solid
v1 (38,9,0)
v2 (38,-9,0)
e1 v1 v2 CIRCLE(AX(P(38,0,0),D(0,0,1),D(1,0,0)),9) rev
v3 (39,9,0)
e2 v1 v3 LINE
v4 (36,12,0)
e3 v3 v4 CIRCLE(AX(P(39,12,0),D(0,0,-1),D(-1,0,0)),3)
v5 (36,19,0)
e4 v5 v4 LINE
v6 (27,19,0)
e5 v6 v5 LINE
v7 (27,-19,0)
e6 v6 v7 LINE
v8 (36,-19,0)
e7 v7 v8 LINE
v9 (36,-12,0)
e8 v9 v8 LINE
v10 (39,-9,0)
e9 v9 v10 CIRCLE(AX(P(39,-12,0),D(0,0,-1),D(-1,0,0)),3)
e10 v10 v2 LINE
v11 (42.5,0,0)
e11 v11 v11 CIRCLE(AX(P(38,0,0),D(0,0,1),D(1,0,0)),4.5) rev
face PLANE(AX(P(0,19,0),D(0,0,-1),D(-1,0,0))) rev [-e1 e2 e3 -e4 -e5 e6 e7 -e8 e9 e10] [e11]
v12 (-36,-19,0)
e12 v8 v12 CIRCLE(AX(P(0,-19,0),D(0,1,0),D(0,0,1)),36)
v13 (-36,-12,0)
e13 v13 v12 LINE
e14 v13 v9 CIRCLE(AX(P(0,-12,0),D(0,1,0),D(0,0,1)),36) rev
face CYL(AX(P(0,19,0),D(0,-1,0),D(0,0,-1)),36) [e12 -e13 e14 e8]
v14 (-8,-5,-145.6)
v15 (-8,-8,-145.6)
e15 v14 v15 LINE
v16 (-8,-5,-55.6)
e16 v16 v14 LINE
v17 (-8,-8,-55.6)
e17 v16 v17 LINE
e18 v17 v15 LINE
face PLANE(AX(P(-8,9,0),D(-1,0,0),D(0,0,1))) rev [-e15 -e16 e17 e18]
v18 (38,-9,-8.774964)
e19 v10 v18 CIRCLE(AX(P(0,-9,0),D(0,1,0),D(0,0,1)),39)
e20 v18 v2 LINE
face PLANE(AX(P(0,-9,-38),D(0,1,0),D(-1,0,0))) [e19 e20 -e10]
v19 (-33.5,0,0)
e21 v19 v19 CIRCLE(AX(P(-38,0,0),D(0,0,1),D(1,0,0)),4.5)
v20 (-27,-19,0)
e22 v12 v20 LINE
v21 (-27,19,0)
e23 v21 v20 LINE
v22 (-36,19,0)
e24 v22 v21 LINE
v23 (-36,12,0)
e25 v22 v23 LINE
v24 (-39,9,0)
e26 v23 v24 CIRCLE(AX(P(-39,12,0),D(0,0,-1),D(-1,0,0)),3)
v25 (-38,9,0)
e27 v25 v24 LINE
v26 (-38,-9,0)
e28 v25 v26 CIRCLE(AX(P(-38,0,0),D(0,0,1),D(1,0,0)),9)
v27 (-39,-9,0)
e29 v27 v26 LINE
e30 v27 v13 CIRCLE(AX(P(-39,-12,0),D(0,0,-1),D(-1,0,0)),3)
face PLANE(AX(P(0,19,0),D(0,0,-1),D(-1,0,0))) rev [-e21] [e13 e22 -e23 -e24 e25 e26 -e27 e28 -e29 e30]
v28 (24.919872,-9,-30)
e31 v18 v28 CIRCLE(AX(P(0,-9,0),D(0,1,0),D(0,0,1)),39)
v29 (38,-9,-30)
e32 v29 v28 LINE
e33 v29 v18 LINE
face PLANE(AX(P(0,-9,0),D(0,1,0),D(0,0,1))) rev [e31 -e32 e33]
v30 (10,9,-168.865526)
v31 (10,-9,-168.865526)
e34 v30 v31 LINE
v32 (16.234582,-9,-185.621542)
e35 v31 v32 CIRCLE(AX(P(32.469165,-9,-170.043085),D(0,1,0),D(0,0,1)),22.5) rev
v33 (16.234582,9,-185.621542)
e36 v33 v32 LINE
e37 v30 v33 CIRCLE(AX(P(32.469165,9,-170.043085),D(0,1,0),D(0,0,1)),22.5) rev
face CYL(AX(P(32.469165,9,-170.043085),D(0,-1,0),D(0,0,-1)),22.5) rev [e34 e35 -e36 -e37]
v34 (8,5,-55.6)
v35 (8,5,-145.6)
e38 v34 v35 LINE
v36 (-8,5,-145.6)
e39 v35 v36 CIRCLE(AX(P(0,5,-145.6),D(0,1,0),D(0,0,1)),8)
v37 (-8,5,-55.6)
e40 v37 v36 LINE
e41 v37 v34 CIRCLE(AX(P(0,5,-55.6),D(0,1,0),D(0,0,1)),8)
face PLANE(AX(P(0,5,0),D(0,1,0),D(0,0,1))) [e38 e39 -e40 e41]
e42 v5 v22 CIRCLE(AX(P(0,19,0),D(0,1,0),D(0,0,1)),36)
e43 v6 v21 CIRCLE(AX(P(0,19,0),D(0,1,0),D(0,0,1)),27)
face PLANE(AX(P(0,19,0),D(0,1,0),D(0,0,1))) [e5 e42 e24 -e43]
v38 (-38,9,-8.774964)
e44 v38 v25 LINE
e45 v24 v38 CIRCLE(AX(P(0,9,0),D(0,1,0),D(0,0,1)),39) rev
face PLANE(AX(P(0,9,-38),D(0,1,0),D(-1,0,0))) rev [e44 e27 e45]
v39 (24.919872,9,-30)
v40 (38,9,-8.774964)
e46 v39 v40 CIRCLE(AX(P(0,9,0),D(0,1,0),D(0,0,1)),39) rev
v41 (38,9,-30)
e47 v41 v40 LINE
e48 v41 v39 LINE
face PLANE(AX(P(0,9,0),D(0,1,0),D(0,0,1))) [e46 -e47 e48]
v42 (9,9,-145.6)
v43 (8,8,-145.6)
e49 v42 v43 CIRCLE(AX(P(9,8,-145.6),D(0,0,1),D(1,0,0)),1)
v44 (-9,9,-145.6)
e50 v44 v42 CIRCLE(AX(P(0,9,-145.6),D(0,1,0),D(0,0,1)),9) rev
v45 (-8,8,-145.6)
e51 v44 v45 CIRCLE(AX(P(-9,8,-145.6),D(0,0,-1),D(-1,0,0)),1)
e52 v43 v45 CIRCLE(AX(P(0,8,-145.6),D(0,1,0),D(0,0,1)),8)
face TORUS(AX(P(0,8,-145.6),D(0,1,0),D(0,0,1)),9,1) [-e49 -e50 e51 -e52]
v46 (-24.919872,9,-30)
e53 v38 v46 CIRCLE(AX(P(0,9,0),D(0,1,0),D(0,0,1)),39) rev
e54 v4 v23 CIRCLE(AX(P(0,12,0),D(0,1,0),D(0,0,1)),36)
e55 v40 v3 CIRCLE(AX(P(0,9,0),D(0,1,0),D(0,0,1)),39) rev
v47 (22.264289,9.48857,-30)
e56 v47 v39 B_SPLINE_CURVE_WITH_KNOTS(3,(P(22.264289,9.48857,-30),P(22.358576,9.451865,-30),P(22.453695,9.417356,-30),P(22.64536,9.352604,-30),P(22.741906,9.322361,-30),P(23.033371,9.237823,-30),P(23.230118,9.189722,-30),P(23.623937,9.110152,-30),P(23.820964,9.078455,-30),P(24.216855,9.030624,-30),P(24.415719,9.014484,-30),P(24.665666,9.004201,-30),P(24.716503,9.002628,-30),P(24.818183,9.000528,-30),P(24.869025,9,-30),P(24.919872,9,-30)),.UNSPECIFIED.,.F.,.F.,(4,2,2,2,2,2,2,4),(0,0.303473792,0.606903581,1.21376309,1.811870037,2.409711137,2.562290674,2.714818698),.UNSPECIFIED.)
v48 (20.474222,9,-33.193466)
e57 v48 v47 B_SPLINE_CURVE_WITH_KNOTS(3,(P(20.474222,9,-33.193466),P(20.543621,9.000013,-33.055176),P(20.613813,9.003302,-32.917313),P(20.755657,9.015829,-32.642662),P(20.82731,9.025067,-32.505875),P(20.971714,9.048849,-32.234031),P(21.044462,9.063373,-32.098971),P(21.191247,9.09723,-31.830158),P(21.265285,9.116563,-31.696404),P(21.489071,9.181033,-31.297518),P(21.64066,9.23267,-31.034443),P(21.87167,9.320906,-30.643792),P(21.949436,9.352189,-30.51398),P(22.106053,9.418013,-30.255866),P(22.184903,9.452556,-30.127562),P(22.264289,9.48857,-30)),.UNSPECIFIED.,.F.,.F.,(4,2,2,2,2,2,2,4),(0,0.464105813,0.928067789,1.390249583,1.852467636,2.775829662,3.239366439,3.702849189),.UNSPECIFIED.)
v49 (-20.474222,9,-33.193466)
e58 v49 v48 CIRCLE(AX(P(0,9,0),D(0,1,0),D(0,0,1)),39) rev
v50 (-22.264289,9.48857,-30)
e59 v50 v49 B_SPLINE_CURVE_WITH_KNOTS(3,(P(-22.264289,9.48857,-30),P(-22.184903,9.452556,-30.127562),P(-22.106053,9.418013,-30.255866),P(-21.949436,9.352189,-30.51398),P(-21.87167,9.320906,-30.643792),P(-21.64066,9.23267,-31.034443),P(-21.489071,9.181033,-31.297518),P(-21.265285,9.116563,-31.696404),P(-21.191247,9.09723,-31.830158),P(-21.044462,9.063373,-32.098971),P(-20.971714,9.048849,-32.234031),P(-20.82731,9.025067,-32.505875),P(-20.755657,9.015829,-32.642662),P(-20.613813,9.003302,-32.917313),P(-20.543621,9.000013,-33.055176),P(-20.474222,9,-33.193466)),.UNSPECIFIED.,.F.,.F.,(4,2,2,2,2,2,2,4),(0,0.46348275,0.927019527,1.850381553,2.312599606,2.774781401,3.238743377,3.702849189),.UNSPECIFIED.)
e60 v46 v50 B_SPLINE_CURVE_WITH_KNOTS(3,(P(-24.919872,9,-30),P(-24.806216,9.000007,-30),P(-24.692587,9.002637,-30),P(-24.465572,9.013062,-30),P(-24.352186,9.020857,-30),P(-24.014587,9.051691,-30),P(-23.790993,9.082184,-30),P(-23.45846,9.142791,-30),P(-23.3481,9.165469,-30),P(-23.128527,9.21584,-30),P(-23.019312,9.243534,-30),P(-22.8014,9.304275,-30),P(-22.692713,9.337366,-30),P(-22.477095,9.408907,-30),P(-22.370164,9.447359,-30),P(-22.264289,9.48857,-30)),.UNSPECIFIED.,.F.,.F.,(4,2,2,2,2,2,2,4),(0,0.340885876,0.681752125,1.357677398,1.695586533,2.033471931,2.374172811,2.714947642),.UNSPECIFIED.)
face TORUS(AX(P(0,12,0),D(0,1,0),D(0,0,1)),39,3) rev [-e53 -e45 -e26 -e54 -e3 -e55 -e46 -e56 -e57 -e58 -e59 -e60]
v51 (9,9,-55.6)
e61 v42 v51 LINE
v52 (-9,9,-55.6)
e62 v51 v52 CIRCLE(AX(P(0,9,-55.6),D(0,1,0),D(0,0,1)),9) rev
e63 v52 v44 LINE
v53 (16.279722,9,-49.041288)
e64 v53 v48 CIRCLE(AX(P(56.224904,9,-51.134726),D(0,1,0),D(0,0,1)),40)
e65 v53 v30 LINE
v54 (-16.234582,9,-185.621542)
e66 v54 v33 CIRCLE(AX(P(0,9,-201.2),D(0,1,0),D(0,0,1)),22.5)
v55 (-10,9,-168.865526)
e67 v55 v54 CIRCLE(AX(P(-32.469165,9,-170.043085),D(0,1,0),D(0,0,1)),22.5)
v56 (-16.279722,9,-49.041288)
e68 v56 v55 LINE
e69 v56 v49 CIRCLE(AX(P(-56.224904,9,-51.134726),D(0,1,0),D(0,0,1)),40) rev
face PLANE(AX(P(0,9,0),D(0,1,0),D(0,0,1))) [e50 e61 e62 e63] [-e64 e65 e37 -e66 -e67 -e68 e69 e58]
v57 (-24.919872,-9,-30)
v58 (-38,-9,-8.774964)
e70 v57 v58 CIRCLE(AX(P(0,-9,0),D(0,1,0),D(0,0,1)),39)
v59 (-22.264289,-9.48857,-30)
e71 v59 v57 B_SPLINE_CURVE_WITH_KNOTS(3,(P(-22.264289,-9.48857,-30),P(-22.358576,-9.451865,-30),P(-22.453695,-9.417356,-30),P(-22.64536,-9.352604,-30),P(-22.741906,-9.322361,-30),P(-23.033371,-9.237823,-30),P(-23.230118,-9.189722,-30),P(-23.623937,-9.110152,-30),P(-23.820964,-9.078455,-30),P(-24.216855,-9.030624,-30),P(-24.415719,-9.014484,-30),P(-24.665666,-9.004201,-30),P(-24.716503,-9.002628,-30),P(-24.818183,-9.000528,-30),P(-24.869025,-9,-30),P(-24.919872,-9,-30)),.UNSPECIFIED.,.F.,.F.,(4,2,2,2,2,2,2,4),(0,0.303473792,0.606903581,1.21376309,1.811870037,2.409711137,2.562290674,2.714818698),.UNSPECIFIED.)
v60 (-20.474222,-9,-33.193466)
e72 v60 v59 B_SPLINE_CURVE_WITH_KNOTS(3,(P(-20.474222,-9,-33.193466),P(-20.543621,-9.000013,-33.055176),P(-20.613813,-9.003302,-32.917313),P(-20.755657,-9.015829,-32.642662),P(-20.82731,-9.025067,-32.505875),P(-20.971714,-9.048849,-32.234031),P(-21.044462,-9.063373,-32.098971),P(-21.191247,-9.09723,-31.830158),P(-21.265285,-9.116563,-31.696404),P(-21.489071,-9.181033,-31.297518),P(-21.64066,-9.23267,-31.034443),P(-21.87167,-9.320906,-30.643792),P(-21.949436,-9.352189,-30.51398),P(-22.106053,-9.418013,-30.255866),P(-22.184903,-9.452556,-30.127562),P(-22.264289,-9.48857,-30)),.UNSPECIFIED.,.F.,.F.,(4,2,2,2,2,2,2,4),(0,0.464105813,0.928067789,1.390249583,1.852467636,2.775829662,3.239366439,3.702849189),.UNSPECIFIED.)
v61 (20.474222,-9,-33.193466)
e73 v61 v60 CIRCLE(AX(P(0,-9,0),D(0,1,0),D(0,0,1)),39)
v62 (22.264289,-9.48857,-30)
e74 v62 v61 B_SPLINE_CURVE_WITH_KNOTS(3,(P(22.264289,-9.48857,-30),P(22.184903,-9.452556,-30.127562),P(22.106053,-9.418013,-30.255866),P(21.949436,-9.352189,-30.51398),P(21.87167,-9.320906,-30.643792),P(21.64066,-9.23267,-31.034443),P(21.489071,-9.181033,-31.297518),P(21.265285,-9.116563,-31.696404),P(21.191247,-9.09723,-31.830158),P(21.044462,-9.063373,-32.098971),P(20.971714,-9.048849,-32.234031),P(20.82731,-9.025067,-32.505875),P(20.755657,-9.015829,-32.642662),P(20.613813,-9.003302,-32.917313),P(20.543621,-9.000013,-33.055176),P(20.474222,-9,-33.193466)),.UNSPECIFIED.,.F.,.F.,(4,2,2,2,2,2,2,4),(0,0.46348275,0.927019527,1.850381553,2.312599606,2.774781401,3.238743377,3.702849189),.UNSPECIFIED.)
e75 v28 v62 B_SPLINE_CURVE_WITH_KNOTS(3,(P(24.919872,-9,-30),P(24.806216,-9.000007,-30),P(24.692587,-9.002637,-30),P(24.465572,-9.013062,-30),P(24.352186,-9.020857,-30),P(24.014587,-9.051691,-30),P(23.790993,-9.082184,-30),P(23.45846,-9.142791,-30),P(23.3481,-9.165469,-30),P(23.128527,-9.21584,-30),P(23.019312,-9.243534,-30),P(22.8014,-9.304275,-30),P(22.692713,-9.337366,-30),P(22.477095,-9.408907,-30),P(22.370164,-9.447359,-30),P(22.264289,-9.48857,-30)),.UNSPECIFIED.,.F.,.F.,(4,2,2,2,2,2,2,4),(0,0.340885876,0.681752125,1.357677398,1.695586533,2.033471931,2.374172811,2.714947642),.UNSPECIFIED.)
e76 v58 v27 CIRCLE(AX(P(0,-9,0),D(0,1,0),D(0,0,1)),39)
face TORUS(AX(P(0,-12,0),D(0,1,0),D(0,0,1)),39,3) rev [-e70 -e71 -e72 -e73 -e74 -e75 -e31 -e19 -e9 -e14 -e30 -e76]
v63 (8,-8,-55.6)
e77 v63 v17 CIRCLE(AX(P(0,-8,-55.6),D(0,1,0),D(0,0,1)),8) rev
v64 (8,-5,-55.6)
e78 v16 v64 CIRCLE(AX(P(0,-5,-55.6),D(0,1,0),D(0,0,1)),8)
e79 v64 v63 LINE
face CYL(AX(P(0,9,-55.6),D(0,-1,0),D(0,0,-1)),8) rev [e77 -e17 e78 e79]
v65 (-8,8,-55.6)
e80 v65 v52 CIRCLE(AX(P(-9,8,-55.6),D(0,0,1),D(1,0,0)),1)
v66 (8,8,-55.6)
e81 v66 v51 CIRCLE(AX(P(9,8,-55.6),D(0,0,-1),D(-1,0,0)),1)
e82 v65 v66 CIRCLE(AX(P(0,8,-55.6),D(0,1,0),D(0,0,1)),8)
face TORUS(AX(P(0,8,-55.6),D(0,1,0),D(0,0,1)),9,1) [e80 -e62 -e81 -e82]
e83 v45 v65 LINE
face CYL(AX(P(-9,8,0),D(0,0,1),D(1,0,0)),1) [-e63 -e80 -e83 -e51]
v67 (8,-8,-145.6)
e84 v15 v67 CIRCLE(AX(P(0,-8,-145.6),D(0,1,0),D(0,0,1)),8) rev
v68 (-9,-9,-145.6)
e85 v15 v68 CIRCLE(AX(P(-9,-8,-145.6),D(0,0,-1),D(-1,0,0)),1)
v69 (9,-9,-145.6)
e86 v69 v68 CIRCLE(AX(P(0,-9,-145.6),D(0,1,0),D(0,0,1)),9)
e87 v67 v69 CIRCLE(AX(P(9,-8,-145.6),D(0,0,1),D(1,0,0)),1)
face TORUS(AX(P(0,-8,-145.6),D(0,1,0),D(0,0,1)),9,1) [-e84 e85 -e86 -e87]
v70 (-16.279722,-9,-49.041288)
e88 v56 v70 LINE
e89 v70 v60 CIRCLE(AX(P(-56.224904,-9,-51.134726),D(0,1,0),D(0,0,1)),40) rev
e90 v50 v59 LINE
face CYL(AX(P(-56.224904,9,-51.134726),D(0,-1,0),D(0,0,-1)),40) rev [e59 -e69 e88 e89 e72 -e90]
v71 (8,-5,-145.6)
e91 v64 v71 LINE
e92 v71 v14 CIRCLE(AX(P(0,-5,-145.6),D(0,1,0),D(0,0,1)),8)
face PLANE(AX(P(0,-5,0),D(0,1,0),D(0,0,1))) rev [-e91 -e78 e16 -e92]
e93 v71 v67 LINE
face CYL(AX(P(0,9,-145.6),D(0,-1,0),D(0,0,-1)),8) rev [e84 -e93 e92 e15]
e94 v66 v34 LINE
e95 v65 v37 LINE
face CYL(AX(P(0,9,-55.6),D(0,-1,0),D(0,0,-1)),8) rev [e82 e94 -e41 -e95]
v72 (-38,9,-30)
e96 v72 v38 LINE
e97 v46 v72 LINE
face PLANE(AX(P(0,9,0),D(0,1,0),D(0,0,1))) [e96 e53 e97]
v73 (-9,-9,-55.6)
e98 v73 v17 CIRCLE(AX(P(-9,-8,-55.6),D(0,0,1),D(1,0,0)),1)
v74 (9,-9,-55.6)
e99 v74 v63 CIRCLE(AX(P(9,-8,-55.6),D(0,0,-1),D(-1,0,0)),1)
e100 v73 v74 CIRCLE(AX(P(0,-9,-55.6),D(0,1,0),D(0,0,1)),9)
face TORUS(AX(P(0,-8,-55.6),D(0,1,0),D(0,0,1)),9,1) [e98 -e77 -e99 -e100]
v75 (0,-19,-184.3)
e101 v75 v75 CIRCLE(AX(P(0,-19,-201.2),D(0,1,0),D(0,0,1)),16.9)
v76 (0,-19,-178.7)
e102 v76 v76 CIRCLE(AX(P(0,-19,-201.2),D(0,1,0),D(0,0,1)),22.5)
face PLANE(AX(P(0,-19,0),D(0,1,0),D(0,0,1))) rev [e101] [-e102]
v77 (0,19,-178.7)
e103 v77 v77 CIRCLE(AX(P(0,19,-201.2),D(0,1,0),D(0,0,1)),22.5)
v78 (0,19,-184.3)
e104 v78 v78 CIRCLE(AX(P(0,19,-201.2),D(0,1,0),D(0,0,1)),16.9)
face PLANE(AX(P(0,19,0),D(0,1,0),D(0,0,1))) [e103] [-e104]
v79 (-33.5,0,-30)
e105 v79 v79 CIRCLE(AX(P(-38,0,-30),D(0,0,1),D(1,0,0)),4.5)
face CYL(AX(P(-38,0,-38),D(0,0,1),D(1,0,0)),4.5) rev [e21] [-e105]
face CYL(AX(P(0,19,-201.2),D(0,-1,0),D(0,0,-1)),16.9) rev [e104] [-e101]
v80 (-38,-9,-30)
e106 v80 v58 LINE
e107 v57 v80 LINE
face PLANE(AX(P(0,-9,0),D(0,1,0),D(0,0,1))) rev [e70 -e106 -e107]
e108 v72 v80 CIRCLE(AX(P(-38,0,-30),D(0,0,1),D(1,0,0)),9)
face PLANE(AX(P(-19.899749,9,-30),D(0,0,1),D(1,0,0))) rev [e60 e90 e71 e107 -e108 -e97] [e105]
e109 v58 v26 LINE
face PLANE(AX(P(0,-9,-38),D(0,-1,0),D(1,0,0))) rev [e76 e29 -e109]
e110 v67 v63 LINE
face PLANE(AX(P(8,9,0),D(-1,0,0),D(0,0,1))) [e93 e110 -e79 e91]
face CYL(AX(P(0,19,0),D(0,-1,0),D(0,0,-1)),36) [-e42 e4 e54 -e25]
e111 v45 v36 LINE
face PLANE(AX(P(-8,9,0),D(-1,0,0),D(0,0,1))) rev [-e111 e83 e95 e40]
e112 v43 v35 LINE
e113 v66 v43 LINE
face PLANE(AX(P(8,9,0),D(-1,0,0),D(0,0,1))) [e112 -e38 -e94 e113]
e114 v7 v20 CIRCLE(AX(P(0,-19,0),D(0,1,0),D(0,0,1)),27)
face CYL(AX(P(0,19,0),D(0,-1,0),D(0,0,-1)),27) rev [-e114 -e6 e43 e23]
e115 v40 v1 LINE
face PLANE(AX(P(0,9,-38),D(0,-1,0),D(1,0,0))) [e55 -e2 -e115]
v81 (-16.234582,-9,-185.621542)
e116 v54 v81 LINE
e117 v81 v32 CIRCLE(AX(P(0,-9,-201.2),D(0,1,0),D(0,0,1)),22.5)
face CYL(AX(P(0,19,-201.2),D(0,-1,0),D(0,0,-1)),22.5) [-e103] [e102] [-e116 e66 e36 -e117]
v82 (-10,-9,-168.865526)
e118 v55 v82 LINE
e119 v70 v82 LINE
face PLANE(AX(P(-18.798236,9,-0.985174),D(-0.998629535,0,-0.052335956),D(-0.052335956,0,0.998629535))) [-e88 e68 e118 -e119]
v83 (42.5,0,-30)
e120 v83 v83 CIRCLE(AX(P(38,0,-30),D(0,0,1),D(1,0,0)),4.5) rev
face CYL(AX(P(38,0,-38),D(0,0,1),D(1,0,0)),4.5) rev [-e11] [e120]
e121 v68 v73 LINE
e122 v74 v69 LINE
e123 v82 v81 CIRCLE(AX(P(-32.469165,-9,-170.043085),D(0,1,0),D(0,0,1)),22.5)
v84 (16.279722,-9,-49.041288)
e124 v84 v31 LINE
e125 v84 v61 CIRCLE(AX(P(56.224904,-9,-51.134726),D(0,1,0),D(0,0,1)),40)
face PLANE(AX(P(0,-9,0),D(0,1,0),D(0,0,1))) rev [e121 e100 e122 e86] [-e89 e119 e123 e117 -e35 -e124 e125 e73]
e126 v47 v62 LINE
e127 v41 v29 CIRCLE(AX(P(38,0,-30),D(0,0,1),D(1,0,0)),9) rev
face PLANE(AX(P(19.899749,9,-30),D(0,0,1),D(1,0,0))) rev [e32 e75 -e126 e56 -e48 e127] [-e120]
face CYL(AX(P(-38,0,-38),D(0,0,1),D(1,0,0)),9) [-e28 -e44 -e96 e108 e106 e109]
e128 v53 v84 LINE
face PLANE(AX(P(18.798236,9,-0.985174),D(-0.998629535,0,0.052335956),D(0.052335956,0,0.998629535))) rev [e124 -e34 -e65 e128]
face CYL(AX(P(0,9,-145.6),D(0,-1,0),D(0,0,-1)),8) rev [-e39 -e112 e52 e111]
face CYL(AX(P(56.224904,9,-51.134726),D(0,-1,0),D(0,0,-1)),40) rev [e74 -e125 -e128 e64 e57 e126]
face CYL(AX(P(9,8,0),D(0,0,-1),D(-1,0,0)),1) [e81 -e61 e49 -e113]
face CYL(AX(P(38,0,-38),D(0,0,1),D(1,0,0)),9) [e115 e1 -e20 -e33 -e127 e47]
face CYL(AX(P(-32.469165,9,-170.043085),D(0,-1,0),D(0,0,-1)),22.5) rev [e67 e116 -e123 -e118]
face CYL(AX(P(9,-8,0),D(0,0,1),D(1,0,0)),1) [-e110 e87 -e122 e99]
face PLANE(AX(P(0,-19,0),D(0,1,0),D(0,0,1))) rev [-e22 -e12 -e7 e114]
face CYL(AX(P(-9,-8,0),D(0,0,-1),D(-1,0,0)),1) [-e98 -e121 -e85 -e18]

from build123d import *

# Parameters (mm, degrees)
SKETCH1_R             = 22.5
SKETCH1_R_2           = 16.9
BOSS_EXTRUDE1_DEPTH   = 19
BOSS_EXTRUDE1_2_DEPTH = 19
BOSS_EXTRUDE2_DEPTH   = 9
BOSS_EXTRUDE3_DEPTH   = 5
FILLET2_R             = 1
BOSS_EXTRUDE4_DEPTH   = 9
FILLET3_R             = 3
SKETCH5_R             = 4.5
CUT_EXTRUDE1_DEPTH    = 38


with BuildPart() as part:
    # Sketch1 → Boss-Extrude1 (new, symmetric)
    with BuildSketch(Plane(origin=(0, 0, 0), x_dir=(1, 0, 0), z_dir=(0, 1, 0))):
        with Locations(Location((0, 201.2, 0), (0, 0, 270))):
            Circle(SKETCH1_R)
        with Locations(Location((0, 201.2, 0), (0, 0, 270))):
            Circle(SKETCH1_R_2, mode=Mode.SUBTRACT)
    extrude(amount=BOSS_EXTRUDE1_DEPTH, both=True)



with BuildPart() as body_2:
    # Sketch1 → Boss-Extrude1 2 (new, symmetric)
    with BuildSketch(Plane(origin=(0, 0, 0), x_dir=(1, 0, 0), z_dir=(0, 1, 0))):
        with BuildLine():
            Line((27, 0), (36, 0))
            ThreePointArc((36, 0), (0, 36), (-36, 0))
            Line((-36, 0), (-27, 0))
            ThreePointArc((-27, 0), (0, 27), (27, 0))
        make_face()
    extrude(amount=BOSS_EXTRUDE1_2_DEPTH, both=True)


with BuildPart() as part_1:
    add(part.part)

    add(body_2.part)  # Boss-Extrude2 merges body 2
    # Sketch1<3> → Boss-Extrude2 (add, symmetric)
    with BuildSketch(Plane(origin=(0, 0, 0), x_dir=(1, 0, 0), z_dir=(0, 1, 0))):
        with BuildLine():
            ThreePointArc((-16.279722223, 49.041287854), (-19.307974883, 35.735363352), (-26.63284908, 24.221712365))
            ThreePointArc((-26.63284908, 24.221712365), (0, 36), (26.63284908, 24.221712365))
            ThreePointArc((26.63284908, 24.221712365), (19.307974883, 35.735363352), (16.279722223, 49.041287854))
            Line((16.279722223, 49.041287854), (10, 168.865525948))
            ThreePointArc((10, 168.865525948), (11.381584619, 177.889356271), (16.234582266, 185.621542482))
            ThreePointArc((16.234582266, 185.621542482), (0, 178.7), (-16.234582266, 185.621542482))
            ThreePointArc((-16.234582266, 185.621542482), (-11.381584619, 177.889356271), (-10, 168.865525948))
            Line((-10, 168.865525948), (-16.279722223, 49.041287854))
        make_face()
        with BuildLine():
            ThreePointArc((8, 55.6), (0, 47.6), (-8, 55.6))
            Line((-8, 55.6), (-8, 145.6))
            ThreePointArc((-8, 145.6), (0, 153.6), (8, 145.6))
            Line((8, 145.6), (8, 55.6))
        make_face(mode=Mode.SUBTRACT)
    extrude(amount=BOSS_EXTRUDE2_DEPTH, both=True)

    # Sketch1<4> → Boss-Extrude3 (add, symmetric)
    with BuildSketch(Plane(origin=(0, 0, 0), x_dir=(1, 0, 0), z_dir=(0, 1, 0))):
        with BuildLine():
            Line((8, 55.6), (8, 145.6))
            ThreePointArc((8, 145.6), (0, 153.6), (-8, 145.6))
            Line((-8, 145.6), (-8, 55.6))
            ThreePointArc((-8, 55.6), (0, 47.6), (8, 55.6))
        make_face()
    extrude(amount=BOSS_EXTRUDE3_DEPTH, both=True)

    # Fillet2
    fillet2_edges = [part_1.edges().sort_by_distance(p)[0] for p in [
        (0, 9, -153.6),
        (8, 9, -100.6),
        (0, 9, -47.6),
        (-8, -9, -100.6),
        (-8, 9, -100.6),
        (0, -9, -153.6),
        (0, -9, -47.6),
        (8, -9, -100.6),
    ]]
    fillet(fillet2_edges, radius=FILLET2_R)

    # Sketch3 → Boss-Extrude4 (add, symmetric)
    with BuildSketch(Plane(origin=(0, 0, 0), x_dir=(1, 0, 0), z_dir=(0, 1, 0))):
        with BuildLine():
            Line((-19.899748742, 30), (-49, 30))
            Line((-49, 30), (-49, 0))
            Line((-49, 0), (-36, 0))
            ThreePointArc((-36, 0), (-31.720584442, 17.023645986), (-19.899748742, 30))
        make_face()
        with BuildLine():
            Line((49, 30), (49, 0))
            Line((49, 0), (36, 0))
            ThreePointArc((36, 0), (31.720584442, 17.023645986), (19.899748742, 30))
            Line((19.899748742, 30), (49, 30))
        make_face()
    extrude(amount=BOSS_EXTRUDE4_DEPTH, both=True)

    # Fillet3
    # the kernel refuses this fillet: 3 mm, written as the material it adds along each edge
    with BuildSketch(Plane(origin=(0, 9, 0), x_dir=(-1, 0, 0), z_dir=(0, 0, 1))) as fillet3_piece_1_section:
        with BuildLine():
            CenterArc((36 + FILLET3_R, -FILLET3_R), FILLET3_R, 90, 90)
            Line((36, -FILLET3_R), (36, 0))
            Line((36, 0), (36 + FILLET3_R, 0))
        make_face()
    fillet3_piece_1 = revolve(axis=Axis((0, 9, 0), (0, -1, 0)), revolution_arc=180, mode=Mode.PRIVATE)
    fillet3_piece_1 = split(fillet3_piece_1, bisect_by=Plane(origin=(-34.322989988, 9.698532199, -30), z_dir=(0, 0, 1)), keep=Keep.TOP, mode=Mode.PRIVATE)
    add(fillet3_piece_1)
    with BuildSketch(Plane(origin=(0, 9, 0), x_dir=(-1, 0, 0), z_dir=(0, 0, 1))) as fillet3_piece_2_section:
        with BuildLine():
            CenterArc((36 + FILLET3_R, -FILLET3_R), FILLET3_R, 90, 90)
            Line((36, -FILLET3_R), (36, 0))
            Line((36, 0), (36 + FILLET3_R, 0))
        make_face()
    fillet3_piece_2 = revolve(axis=Axis((0, 9, 0), (0, -1, 0)), revolution_arc=180, mode=Mode.PRIVATE)
    fillet3_piece_2 = fillet3_piece_2 - Plane(origin=(56.224903613, 10.5000003, -51.134726104), x_dir=(-0.7398013633284897, 0, 0.6728253434713263), z_dir=(0, 1, 0)) * Cylinder(40, 157, mode=Mode.PRIVATE)
    fillet3_piece_2 = fillet3_piece_2 - Plane(origin=(-56.224903613, 10.5000003, -51.134726104), x_dir=(0.9986295347545738, 0, 0.05233595624294564), z_dir=(0, 1, 0)) * Cylinder(40, 157, mode=Mode.PRIVATE)
    add(fillet3_piece_2)
    with BuildSketch(Plane(origin=(0, -9, 0), x_dir=(1, 0, 0), z_dir=(0, 0, 1))) as fillet3_piece_3_section:
        with BuildLine():
            CenterArc((36 + FILLET3_R, -FILLET3_R), FILLET3_R, 90, 90)
            Line((36, -FILLET3_R), (36, 0))
            Line((36, 0), (36 + FILLET3_R, 0))
        make_face()
    fillet3_piece_3 = revolve(axis=Axis((0, -9, 0), (0, 1, 0)), revolution_arc=180, mode=Mode.PRIVATE)
    fillet3_piece_3 = split(fillet3_piece_3, bisect_by=Plane(origin=(34.322988047, -9.698532268, -30), z_dir=(0, 0, 1)), keep=Keep.TOP, mode=Mode.PRIVATE)
    add(fillet3_piece_3)
    with BuildSketch(Plane(origin=(0, -9, 0), x_dir=(1, 0, 0), z_dir=(0, 0, 1))) as fillet3_piece_4_section:
        with BuildLine():
            CenterArc((36 + FILLET3_R, -FILLET3_R), FILLET3_R, 90, 90)
            Line((36, -FILLET3_R), (36, 0))
            Line((36, 0), (36 + FILLET3_R, 0))
        make_face()
    fillet3_piece_4 = revolve(axis=Axis((0, -9, 0), (0, 1, 0)), revolution_arc=180, mode=Mode.PRIVATE)
    fillet3_piece_4 = fillet3_piece_4 - Plane(origin=(56.224903613, -10.5000003, -51.134726104), x_dir=(-0.7398013633284897, 0, 0.6728253434713263), z_dir=(0, 1, 0)) * Cylinder(40, 157, mode=Mode.PRIVATE)
    fillet3_piece_4 = fillet3_piece_4 - Plane(origin=(-56.224903613, -10.5000003, -51.134726104), x_dir=(0.9986295347545738, 0, 0.05233595624294564), z_dir=(0, 1, 0)) * Cylinder(40, 157, mode=Mode.PRIVATE)
    add(fillet3_piece_4)

    # Sketch5 → Cut-Extrude1 (cut)
    with BuildSketch(Plane.XY):
        with BuildLine():
            Line((39, -9), (49, -9))
            Line((49, -9), (49, 9))
            Line((49, 9), (39, 9))
            Line((39, 9), (38, 9))
            ThreePointArc((38, 9), (47, 0), (38, -9))
            Line((38, -9), (39, -9))
        make_face()
        with BuildLine():
            ThreePointArc((-38, 9), (-47, 0), (-38, -9))
            Line((-38, -9), (-49, -9))
            Line((-49, -9), (-49, 9))
            Line((-49, 9), (-38, 9))
        make_face()
        with Locations((38, 0)):
            Circle(SKETCH5_R)
        with Locations((-38, 0)):
            Circle(SKETCH5_R)
    extrude(amount=-CUT_EXTRUDE1_DEPTH, mode=Mode.SUBTRACT)


solid = part_1.part
